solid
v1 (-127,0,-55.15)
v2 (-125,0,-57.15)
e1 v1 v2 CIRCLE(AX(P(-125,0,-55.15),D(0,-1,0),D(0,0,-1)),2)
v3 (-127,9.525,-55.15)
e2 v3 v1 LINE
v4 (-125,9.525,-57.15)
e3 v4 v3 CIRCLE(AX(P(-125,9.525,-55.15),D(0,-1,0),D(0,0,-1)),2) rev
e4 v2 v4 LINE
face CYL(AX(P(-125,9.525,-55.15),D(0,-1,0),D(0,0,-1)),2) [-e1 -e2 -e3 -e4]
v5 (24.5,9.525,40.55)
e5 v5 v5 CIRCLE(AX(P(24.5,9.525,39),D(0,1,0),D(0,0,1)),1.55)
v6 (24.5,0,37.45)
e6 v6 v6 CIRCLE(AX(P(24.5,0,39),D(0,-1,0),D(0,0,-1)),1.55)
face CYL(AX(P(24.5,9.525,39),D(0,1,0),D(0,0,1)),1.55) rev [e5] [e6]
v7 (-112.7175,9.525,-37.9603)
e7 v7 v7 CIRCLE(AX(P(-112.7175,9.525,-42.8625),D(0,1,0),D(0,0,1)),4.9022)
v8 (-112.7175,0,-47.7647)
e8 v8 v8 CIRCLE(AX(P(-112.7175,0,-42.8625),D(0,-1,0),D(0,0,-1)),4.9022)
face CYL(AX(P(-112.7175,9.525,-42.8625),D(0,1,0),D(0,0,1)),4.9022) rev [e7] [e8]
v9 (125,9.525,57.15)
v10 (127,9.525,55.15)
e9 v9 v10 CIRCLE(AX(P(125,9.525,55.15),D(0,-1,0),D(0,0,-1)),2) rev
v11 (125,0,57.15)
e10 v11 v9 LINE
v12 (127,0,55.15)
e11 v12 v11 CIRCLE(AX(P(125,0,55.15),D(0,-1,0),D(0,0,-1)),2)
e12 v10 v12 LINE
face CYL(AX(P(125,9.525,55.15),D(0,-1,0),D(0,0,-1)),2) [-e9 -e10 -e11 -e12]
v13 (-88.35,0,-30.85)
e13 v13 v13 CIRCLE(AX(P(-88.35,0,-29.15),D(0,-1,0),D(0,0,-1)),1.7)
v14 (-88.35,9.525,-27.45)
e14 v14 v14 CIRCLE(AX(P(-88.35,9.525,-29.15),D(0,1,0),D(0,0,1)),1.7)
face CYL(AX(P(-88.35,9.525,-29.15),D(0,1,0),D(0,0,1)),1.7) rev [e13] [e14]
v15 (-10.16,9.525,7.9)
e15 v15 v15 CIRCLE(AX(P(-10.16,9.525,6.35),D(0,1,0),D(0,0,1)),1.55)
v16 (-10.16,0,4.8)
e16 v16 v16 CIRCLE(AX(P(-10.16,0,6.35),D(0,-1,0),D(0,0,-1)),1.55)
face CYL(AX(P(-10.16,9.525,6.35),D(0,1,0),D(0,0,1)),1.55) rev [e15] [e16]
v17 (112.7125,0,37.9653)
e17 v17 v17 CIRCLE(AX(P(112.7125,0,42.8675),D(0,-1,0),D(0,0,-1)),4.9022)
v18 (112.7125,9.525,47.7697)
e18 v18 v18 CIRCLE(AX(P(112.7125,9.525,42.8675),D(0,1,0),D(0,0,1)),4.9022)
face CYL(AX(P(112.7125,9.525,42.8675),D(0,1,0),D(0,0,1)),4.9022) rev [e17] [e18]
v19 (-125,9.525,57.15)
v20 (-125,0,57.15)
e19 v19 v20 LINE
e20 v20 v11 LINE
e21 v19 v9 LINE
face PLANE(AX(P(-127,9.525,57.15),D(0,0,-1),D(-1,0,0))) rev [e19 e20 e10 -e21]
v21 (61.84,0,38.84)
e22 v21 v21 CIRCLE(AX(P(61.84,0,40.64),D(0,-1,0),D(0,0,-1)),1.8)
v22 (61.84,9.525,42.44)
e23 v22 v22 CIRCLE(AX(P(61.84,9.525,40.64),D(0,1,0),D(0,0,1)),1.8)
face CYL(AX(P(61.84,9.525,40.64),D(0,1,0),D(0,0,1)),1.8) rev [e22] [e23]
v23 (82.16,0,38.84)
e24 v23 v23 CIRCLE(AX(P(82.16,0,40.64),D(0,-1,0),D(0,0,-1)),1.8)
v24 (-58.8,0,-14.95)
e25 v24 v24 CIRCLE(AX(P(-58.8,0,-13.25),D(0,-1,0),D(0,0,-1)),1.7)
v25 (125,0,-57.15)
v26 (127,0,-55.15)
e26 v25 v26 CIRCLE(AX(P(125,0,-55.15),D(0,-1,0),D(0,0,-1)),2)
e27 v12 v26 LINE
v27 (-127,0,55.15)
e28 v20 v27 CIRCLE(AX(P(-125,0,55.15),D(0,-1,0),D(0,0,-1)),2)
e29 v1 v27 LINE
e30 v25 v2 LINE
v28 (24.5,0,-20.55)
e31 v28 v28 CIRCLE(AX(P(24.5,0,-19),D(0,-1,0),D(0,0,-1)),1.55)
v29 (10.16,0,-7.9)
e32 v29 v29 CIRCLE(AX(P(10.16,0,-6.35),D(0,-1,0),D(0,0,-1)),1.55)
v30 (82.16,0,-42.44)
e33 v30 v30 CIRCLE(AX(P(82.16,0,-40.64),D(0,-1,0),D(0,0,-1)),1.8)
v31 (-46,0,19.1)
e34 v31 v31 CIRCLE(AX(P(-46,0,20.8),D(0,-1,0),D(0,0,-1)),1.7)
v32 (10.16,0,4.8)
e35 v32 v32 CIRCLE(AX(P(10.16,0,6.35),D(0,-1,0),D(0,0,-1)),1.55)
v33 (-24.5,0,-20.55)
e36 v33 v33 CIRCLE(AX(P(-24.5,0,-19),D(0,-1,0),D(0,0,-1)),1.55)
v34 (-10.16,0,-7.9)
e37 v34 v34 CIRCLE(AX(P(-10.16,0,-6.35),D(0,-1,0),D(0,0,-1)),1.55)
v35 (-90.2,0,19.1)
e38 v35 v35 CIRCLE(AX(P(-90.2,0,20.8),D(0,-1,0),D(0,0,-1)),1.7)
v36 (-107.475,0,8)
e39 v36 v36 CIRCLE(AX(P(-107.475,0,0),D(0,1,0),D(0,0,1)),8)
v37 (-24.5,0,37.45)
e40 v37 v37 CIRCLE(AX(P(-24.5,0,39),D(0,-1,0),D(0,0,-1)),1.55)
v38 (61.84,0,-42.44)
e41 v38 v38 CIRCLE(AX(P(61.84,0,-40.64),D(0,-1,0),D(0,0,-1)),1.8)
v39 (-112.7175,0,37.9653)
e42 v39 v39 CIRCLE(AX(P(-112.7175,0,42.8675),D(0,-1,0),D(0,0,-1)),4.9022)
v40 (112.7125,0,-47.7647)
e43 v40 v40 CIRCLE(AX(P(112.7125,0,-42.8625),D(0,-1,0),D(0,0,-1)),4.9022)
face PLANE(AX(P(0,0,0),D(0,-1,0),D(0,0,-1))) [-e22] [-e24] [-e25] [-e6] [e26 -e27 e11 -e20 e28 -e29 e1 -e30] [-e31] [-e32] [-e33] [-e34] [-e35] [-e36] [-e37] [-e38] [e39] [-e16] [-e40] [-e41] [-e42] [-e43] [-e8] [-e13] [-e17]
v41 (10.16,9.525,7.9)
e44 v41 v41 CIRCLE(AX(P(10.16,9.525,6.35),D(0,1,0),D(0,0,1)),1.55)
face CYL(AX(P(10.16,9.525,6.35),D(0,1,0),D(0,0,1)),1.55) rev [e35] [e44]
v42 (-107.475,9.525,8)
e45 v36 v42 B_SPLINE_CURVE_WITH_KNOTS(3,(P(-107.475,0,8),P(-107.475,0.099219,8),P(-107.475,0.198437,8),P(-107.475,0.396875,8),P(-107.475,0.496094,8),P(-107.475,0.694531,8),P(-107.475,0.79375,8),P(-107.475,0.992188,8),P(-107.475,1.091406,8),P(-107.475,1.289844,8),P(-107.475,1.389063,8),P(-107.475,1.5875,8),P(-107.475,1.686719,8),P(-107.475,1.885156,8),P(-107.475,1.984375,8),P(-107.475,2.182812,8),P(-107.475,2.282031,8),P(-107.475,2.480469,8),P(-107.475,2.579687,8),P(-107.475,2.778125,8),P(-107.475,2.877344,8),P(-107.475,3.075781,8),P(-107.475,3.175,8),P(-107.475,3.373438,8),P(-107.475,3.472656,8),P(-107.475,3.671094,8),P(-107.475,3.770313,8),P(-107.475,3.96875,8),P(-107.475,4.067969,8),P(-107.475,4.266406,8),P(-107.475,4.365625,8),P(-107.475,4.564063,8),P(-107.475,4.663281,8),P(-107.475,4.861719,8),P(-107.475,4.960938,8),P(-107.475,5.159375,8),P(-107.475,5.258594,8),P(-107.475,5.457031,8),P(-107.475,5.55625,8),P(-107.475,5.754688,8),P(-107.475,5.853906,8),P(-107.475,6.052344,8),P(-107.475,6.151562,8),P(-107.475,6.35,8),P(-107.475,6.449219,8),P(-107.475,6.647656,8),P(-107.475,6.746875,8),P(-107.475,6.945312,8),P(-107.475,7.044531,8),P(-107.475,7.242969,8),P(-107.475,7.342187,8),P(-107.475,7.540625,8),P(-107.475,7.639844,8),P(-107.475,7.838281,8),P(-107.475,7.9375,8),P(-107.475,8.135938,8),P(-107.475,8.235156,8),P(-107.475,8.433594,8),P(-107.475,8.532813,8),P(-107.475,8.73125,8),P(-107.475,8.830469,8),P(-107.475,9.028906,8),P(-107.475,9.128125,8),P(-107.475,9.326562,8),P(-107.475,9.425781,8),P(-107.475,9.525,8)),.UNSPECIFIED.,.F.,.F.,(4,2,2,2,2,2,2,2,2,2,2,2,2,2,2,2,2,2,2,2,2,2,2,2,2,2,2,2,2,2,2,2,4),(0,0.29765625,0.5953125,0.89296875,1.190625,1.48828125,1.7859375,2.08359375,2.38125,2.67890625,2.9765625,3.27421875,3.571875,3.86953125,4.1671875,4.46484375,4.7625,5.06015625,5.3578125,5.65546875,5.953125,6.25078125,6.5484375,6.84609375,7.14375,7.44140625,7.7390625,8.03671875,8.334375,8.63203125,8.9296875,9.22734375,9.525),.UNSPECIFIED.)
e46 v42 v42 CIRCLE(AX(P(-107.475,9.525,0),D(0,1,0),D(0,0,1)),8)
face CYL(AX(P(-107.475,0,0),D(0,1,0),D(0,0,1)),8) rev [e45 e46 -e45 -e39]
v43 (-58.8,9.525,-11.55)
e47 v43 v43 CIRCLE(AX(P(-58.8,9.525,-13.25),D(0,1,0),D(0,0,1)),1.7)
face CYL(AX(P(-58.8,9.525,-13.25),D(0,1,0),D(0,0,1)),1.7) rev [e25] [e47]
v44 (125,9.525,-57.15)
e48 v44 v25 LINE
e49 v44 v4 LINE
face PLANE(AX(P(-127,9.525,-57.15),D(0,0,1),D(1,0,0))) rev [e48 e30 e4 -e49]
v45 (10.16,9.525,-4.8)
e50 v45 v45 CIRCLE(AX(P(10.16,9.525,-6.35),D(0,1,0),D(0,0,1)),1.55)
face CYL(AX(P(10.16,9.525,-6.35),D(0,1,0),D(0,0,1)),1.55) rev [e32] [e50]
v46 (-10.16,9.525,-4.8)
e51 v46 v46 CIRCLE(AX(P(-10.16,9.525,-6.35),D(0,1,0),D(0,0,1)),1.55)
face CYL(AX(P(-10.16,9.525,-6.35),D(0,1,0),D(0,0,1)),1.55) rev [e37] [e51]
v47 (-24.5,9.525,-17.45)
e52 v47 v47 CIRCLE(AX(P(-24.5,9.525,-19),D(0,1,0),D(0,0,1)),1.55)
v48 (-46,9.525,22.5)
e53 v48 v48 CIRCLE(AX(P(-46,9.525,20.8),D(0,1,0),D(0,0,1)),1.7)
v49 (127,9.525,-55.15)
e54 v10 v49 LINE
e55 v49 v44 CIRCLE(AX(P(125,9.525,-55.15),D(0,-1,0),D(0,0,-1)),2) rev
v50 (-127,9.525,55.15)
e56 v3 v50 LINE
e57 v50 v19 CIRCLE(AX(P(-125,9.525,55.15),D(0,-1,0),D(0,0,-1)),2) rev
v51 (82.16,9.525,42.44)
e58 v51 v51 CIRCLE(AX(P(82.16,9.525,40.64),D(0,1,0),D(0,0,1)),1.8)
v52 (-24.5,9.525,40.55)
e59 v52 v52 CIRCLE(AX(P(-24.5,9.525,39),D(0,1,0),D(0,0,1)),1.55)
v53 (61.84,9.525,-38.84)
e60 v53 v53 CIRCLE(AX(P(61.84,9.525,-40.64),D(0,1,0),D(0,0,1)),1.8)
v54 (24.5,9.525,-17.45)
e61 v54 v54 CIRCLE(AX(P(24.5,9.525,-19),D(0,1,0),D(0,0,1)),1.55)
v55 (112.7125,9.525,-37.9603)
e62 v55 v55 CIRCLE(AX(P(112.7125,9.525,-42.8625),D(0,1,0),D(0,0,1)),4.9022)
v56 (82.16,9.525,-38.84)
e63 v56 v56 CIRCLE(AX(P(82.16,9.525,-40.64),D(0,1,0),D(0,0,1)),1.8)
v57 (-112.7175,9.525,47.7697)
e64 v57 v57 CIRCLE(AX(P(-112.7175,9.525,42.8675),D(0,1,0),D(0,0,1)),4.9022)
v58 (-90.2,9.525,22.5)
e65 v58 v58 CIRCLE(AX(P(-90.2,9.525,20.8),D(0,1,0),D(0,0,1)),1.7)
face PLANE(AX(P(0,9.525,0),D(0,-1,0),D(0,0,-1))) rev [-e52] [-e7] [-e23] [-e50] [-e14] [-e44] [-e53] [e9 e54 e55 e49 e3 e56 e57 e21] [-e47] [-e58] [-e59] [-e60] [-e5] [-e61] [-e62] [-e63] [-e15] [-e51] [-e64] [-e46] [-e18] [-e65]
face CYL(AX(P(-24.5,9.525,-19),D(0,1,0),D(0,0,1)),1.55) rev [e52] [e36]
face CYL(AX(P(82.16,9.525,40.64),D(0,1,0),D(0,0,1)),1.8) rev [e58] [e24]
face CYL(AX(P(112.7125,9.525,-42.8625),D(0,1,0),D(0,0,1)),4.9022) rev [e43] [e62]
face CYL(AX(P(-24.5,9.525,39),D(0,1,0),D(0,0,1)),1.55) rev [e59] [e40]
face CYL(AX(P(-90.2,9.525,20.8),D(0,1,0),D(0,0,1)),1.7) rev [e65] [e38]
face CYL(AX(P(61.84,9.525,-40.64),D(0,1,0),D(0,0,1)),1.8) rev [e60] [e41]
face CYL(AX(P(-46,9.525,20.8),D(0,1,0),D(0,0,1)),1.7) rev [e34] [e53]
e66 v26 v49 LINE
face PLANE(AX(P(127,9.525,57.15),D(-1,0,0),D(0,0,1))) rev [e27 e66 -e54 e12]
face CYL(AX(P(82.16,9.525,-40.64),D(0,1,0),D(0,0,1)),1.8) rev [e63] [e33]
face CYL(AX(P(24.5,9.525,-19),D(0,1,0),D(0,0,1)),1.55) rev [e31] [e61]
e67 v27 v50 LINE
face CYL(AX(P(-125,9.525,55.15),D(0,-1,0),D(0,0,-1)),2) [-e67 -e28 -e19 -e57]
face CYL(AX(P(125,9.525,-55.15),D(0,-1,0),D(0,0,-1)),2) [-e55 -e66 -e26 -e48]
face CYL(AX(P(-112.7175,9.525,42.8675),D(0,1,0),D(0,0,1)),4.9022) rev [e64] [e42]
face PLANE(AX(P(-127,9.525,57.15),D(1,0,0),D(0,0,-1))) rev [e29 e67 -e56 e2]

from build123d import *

# Parameters (mm, degrees)
SKETCH1_W                      = 254
SKETCH1_H                      = 114.3
BOSS_EXTRUDE1_DEPTH            = 9.525
F_3_8_CLEARANCE_HOLE1_D        = 9.8044
F_3_8_CLEARANCE_HOLE1_DEPTH    = 10
F_3_8_CLEARANCE_HOLE1_TIP      = 2.945538927
M2_5_CLEARANCE_HOLE3_D         = 3.1
M2_5_CLEARANCE_HOLE3_DEPTH     = 10
M2_5_CLEARANCE_HOLE3_TIP       = 0.931333959
FILLET1_R                      = 2
M3_CLEARANCE_HOLE4_D           = 3.4
M3_CLEARANCE_HOLE4_DEPTH       = 10
M3_CLEARANCE_HOLE4_TIP         = 1.021463052
SKETCH22_R                     = 8
CUT_EXTRUDE1_DEPTH             = 140.5917194
M3_CLEARANCE_HOLE5_D           = 3.6
M3_CLEARANCE_HOLE5_DEPTH       = 10
M3_CLEARANCE_HOLE5_TIP         = 1.081549114
M2_5_CLEARANCE_HOLE4_OUTLINE_R = 1.55
M2_5_CLEARANCE_HOLE4_DEPTH     = 9.525


# Read off the part's stored shape, not the designer's step: M2.5 Clearance Hole4
with BuildPart() as part:
    # Sketch1 → Boss-Extrude1 (new body)
    with BuildSketch(Plane(origin=(0, 0, 0), x_dir=(1, 0, 0), z_dir=(0, 1, 0))):
        Rectangle(SKETCH1_W, SKETCH1_H)
    extrude(amount=BOSS_EXTRUDE1_DEPTH)

    # 3/8 Clearance Hole1
    with Locations(Plane(origin=(0, 9.525, 0), x_dir=(1, 0, 0), z_dir=(0, 1, 0))):
        with Locations((112.7125, 42.8625), (112.7125, -42.8675), (-112.7175, 42.8625), (-112.7175, -42.8675)):
            Hole(F_3_8_CLEARANCE_HOLE1_D / 2, depth=F_3_8_CLEARANCE_HOLE1_DEPTH)
            with Locations((0, 0, -(F_3_8_CLEARANCE_HOLE1_DEPTH + F_3_8_CLEARANCE_HOLE1_TIP / 2))):  # 118° drill point
                Cone(0, F_3_8_CLEARANCE_HOLE1_D / 2, F_3_8_CLEARANCE_HOLE1_TIP, mode=Mode.SUBTRACT)

    # M2.5 Clearance Hole3
    with Locations(Plane(origin=(0, 9.525, 0), x_dir=(1, 0, 0), z_dir=(0, 1, 0))):
        with Locations((24.5, 19), (-24.5, -39), (24.5, -39), (-24.5, 19)):
            Hole(M2_5_CLEARANCE_HOLE3_D / 2, depth=M2_5_CLEARANCE_HOLE3_DEPTH)
            with Locations((0, 0, -(M2_5_CLEARANCE_HOLE3_DEPTH + M2_5_CLEARANCE_HOLE3_TIP / 2))):  # 118° drill point
                Cone(0, M2_5_CLEARANCE_HOLE3_D / 2, M2_5_CLEARANCE_HOLE3_TIP, mode=Mode.SUBTRACT)

    # Fillet1
    fillet1_edges = [part.edges().sort_by_distance(p)[0] for p in [
        (127, 4.7625, 57.15),
        (-127, 4.7625, 57.15),
        (-127, 4.7625, -57.15),
        (127, 4.7625, -57.15),
    ]]
    fillet(fillet1_edges, radius=FILLET1_R)

    # M3 Clearance Hole4
    with Locations(Plane(origin=(0, 9.525, 0), x_dir=(1, 0, 0), z_dir=(0, 1, 0))):
        with Locations((-90.2, -20.8), (-88.35, 29.15), (-58.8, 13.25), (-46, -20.8)):
            Hole(M3_CLEARANCE_HOLE4_D / 2, depth=M3_CLEARANCE_HOLE4_DEPTH)
            with Locations((0, 0, -(M3_CLEARANCE_HOLE4_DEPTH + M3_CLEARANCE_HOLE4_TIP / 2))):  # 118° drill point
                Cone(0, M3_CLEARANCE_HOLE4_D / 2, M3_CLEARANCE_HOLE4_TIP, mode=Mode.SUBTRACT)

    # Sketch22 → Cut-Extrude1 (cut, through all)
    with BuildSketch(Plane(origin=(0, 9.525, 0), x_dir=(1, 0, 0), z_dir=(0, 1, 0))):
        with Locations(Location((-107.475, 0, 0), (0, 0, 270))):
            Circle(SKETCH22_R)
    extrude(amount=-CUT_EXTRUDE1_DEPTH, mode=Mode.SUBTRACT)

    # M3 Clearance Hole5
    with Locations(Plane(origin=(0, 9.525, 0), x_dir=(1, 0, 0), z_dir=(0, 1, 0))):
        with Locations((61.84, 40.64), (61.84, -40.64), (82.16, -40.64), (82.16, 40.64)):
            Hole(M3_CLEARANCE_HOLE5_D / 2, depth=M3_CLEARANCE_HOLE5_DEPTH)
            with Locations((0, 0, -(M3_CLEARANCE_HOLE5_DEPTH + M3_CLEARANCE_HOLE5_TIP / 2))):  # 118° drill point
                Cone(0, M3_CLEARANCE_HOLE5_D / 2, M3_CLEARANCE_HOLE5_TIP, mode=Mode.SUBTRACT)

    # M2.5 Clearance Hole4 outline → M2.5 Clearance Hole4 (cut)
    with BuildSketch(Plane(origin=(0, 0, 0), x_dir=(1, 0, 0), z_dir=(0, 1, 0))):
        with Locations((-10.16, 6.35)):
            Circle(M2_5_CLEARANCE_HOLE4_OUTLINE_R)
        with Locations((10.16, 6.35)):
            Circle(M2_5_CLEARANCE_HOLE4_OUTLINE_R)
        with Locations((10.16, -6.35)):
            Circle(M2_5_CLEARANCE_HOLE4_OUTLINE_R)
        with Locations((-10.16, -6.35)):
            Circle(M2_5_CLEARANCE_HOLE4_OUTLINE_R)
    extrude(amount=M2_5_CLEARANCE_HOLE4_DEPTH, mode=Mode.SUBTRACT)


solid = part.part
